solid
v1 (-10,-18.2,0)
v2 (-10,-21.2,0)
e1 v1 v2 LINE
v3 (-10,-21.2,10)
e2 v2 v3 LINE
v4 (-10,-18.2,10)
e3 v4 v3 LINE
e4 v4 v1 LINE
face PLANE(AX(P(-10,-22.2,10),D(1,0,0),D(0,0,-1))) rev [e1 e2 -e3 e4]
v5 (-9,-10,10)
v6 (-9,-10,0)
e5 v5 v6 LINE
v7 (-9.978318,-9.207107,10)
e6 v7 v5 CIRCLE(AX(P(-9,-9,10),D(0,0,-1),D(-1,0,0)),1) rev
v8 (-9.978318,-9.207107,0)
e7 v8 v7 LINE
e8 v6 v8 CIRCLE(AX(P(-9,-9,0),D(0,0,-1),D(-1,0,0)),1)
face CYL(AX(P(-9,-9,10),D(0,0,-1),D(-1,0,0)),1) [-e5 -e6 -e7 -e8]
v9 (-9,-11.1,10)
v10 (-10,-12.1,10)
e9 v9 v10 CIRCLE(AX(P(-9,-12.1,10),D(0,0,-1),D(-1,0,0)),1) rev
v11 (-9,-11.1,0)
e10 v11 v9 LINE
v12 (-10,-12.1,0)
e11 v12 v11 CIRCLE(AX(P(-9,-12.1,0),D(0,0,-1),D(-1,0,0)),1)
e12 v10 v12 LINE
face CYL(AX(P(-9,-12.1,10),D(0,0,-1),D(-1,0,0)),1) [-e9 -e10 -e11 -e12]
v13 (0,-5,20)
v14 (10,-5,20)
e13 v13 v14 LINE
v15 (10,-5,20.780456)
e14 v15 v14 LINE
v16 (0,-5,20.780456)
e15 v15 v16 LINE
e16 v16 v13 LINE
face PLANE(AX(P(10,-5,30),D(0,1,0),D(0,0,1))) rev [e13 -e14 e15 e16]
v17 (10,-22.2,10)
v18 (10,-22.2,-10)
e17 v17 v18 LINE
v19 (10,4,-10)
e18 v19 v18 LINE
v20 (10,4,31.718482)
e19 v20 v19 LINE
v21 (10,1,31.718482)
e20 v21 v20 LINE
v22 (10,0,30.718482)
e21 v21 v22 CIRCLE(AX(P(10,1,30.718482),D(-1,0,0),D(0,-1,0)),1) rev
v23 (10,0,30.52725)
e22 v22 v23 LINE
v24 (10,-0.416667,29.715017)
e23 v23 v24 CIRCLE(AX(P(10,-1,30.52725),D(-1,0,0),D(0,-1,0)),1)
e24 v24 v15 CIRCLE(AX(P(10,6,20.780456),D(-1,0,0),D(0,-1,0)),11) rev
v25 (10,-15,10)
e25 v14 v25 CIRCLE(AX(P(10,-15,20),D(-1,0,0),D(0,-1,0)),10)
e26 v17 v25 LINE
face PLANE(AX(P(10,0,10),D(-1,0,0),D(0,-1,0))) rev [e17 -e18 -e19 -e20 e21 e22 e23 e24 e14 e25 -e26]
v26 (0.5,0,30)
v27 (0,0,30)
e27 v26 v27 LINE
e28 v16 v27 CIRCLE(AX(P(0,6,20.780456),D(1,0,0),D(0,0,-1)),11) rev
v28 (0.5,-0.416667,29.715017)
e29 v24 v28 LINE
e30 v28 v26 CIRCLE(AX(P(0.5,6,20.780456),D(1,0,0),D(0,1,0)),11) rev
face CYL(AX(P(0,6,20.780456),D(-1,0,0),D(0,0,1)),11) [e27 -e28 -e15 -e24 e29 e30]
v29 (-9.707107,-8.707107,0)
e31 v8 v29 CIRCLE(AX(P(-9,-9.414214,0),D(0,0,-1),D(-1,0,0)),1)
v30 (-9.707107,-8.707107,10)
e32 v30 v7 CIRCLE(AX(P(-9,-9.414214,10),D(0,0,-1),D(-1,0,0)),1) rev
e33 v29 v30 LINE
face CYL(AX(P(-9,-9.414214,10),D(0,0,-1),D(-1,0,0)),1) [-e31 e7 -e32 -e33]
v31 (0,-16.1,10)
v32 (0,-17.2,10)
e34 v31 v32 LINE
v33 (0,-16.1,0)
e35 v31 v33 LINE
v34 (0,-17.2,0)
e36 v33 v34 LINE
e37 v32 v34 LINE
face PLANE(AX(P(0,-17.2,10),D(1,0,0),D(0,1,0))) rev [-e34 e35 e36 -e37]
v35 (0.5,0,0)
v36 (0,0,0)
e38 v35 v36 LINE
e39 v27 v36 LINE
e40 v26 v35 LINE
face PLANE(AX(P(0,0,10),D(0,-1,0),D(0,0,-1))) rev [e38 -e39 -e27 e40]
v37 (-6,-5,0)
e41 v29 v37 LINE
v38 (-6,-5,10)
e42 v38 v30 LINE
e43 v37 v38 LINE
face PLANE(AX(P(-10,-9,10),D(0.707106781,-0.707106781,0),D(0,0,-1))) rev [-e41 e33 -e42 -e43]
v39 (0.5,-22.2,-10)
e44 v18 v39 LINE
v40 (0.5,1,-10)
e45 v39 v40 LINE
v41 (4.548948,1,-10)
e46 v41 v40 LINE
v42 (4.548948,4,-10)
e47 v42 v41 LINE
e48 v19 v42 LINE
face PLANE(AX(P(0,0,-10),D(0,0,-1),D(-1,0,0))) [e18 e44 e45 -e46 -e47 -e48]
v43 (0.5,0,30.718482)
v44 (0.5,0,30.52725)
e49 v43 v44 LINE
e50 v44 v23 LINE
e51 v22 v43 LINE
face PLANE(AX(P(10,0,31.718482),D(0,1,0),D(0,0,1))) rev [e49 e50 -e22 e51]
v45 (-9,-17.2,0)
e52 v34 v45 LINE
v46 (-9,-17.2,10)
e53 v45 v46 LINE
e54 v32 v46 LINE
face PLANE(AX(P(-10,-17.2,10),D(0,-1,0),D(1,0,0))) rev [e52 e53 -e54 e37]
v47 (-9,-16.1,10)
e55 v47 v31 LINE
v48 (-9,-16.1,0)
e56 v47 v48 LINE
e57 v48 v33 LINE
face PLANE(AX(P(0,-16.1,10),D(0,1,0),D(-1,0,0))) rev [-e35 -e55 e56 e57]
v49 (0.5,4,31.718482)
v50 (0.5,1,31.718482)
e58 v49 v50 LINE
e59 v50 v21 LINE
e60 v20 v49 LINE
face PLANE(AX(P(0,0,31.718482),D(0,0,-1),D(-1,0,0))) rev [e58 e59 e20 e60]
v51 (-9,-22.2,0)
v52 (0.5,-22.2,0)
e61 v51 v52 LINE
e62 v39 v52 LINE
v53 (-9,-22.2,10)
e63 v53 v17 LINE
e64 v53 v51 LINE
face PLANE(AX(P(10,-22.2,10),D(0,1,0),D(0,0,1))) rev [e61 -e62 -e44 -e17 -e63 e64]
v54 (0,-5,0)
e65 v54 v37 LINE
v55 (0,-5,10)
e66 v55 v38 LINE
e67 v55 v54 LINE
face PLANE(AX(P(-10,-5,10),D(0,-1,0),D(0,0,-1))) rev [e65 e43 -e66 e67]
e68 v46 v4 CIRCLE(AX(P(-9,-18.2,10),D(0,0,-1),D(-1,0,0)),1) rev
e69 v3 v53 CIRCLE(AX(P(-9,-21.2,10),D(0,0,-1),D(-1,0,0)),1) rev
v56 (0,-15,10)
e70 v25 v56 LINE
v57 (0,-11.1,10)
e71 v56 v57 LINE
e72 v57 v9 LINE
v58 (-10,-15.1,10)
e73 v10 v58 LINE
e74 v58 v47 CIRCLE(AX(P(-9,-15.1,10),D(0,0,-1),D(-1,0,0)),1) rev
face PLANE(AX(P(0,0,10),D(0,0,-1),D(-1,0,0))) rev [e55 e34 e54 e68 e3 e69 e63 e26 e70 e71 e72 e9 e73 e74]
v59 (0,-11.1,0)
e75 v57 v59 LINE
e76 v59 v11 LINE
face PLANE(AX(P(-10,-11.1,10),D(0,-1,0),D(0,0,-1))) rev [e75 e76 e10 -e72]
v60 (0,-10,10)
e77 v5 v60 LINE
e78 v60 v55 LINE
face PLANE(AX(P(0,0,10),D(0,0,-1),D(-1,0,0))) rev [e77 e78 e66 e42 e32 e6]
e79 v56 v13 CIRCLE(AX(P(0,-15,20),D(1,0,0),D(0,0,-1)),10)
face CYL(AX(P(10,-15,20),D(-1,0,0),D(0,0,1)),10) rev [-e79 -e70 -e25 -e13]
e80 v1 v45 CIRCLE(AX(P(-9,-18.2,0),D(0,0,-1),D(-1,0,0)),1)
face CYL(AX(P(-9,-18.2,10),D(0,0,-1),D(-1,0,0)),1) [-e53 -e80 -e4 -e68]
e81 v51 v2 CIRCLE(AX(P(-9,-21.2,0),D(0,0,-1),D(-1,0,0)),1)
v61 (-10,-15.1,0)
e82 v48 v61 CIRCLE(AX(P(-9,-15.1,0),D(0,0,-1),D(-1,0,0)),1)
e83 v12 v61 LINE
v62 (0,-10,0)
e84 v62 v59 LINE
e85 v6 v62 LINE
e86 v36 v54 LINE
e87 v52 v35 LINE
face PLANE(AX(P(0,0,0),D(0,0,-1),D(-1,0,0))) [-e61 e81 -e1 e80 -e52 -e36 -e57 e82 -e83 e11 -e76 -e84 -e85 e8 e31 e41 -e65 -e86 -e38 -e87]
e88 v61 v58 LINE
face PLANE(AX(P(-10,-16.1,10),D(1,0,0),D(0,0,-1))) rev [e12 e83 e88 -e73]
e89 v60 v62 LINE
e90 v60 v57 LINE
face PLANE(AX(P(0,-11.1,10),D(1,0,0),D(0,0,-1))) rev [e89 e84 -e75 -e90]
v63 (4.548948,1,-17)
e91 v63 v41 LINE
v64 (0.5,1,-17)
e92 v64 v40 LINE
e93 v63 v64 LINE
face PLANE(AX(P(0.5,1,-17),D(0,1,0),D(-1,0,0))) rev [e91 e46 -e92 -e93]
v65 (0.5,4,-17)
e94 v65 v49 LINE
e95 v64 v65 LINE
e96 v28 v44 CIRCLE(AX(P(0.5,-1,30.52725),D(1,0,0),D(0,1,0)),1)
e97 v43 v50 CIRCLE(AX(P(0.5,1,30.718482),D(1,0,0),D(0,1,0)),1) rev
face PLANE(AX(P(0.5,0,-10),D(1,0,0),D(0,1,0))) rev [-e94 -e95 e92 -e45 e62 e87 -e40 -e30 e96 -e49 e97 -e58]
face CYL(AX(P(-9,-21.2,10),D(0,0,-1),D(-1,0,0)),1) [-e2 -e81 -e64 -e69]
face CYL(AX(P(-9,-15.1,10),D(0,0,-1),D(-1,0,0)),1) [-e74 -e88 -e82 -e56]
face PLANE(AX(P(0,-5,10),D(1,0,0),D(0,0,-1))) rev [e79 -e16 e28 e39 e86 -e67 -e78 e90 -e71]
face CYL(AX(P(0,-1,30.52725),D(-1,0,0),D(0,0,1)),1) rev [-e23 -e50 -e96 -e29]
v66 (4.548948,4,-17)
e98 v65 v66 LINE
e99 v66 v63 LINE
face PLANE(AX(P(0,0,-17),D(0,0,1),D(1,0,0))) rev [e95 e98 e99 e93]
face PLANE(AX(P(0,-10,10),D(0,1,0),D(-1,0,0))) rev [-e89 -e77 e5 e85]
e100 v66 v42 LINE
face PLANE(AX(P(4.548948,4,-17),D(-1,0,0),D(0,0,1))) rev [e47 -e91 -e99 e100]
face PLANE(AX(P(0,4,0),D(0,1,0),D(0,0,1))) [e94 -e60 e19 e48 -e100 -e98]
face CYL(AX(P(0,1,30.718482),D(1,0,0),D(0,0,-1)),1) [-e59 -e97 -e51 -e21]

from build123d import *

# Parameters (mm, degrees)
BOSS_EXTRU_1_DEPTH = 10
ESQUISSE2_W        = 9.5
ESQUISSE2_H        = 22.2
BOSS_EXTRU_2_DEPTH = 10
ESQUISSE3_W        = 10
ESQUISSE3_H        = 5
BOSS_EXTRU_3_DEPTH = 20
CONG_1_R           = 10
CHANFREIN1_SIZE    = 4
CONG_3_R           = 1
ESQUISSE5_W        = 9.5
ESQUISSE5_H        = 4.718482058
BOSS_EXTRU_5_DEPTH = 4
ESQUISSE6_W        = 4.048947881
ESQUISSE6_H        = 3
BOSS_EXTRU_6_DEPTH = 7
ESQUISSE7_W        = 9.5
ESQUISSE7_H        = 4
BOSS_EXTRU_7_DEPTH = 37
CONG_4_R           = 11
CONG_6_R           = 1


with BuildPart() as part:
    # Esquisse1 → Boss.-Extru.1 (new body)
    with BuildSketch(Plane.XY):
        Polygon((0, 0), (10, 0), (10, -22.2), (-10, -22.2), (-10, -17.2), (0, -17.2), (0, -16.1), (-10, -16.1), (-10, -11.1), (0, -11.1), (0, -10), (-10, -10), (-10, -5), (0, -5), align=None)
    extrude(amount=BOSS_EXTRU_1_DEPTH)

    # Esquisse2 → Boss.-Extru.2 (add)
    with BuildSketch(Plane(origin=(0, 0, 0), x_dir=(-1, 0, 0), z_dir=(0, 0, -1))):
        with Locations((-5.25, -11.1)):
            Rectangle(ESQUISSE2_W, ESQUISSE2_H)
    extrude(amount=BOSS_EXTRU_2_DEPTH)

    # Esquisse3 → Boss.-Extru.3 (add)
    with BuildSketch(Plane.XY.offset(10)):
        with Locations((5, -2.5)):
            Rectangle(ESQUISSE3_W, ESQUISSE3_H)
    extrude(amount=BOSS_EXTRU_3_DEPTH)

    # Congé1
    # the kernel refuses this fillet: 10 mm, written as the material it adds along each edge
    with BuildSketch(Plane(origin=(0, -5, 10), x_dir=(0, -1, 0), z_dir=(1, 0, 0))) as cong_1_piece_1:
        with BuildLine():
            CenterArc((CONG_1_R, -CONG_1_R), CONG_1_R, 90, 90)
            Line((0, -CONG_1_R), (0, 0))
            Line((0, 0), (CONG_1_R, 0))
        make_face()
    extrude(amount=10)

    # Chanfrein1
    chanfrein1_edges = [part.edges().sort_by_distance(p)[0] for p in [
        (-10, -5, 5),
    ]]
    chamfer(chanfrein1_edges, length=CHANFREIN1_SIZE)

    # Congé3
    # the kernel refuses this fillet: 1 mm, written as the material it takes off along each edge
    with BuildSketch(Plane(origin=(-10, -22.2, -2.5), x_dir=(1, 0, 0), z_dir=(0, 0, 1)), Plane(origin=(-10, -17.2, -2.5), x_dir=(0, -1, 0), z_dir=(0, 0, 1))) as cong_3_piece_1:
        with BuildLine():
            CenterArc((CONG_3_R, CONG_3_R), CONG_3_R, 180, 90)
            Line((0, CONG_3_R), (0, 0))
            Line((0, 0), (CONG_3_R, 0))
        make_face()
    extrude(amount=15, mode=Mode.SUBTRACT)
    with BuildSketch(Plane(origin=(-10, -16.1, -2.5), x_dir=(0, 1, 0), z_dir=(0, 0, 1)), Plane(origin=(-10, -11.1, -2.5), x_dir=(1, 0, 0), z_dir=(0, 0, 1)), Plane(origin=(-10, -10, -2.5), x_dir=(0, 1, 0), z_dir=(0, 0, 1))) as cong_3_piece_2:
        with BuildLine():
            CenterArc((CONG_3_R, -CONG_3_R), CONG_3_R, 90, 90)
            Line((0, -CONG_3_R), (0, 0))
            Line((0, 0), (CONG_3_R, 0))
        make_face()
    extrude(amount=15, mode=Mode.SUBTRACT)
    with BuildSketch(Plane(origin=(-10, -9, -1.035533906), x_dir=(0, -1, 0), z_dir=(0, 0, 1))) as cong_3_piece_3:
        with BuildLine():
            CenterArc((CONG_3_R * 0.414213562373, CONG_3_R), CONG_3_R, 225, 45)
            Line((-CONG_3_R * 0.292893218813, CONG_3_R * 0.292893218813), (0, 0))
            Line((0, 0), (CONG_3_R * 0.414213562373, 0))
        make_face()
    extrude(amount=12.071067812, mode=Mode.SUBTRACT)

    # Esquisse5 → Boss.-Extru.5 (add)
    with BuildSketch(Plane(origin=(0, 0, 0), x_dir=(1, 0, 0), z_dir=(0, 1, 0))):
        with Locations((5.25, 7.640758971)):
            Rectangle(ESQUISSE5_W, ESQUISSE5_H)
    extrude(amount=BOSS_EXTRU_5_DEPTH)

    # Esquisse6 → Boss.-Extru.6 (add)
    with BuildSketch(Plane(origin=(0, 0, -10), x_dir=(-1, 0, 0), z_dir=(0, 0, -1))):
        with Locations((-2.524473941, 2.5)):
            Rectangle(ESQUISSE6_W, ESQUISSE6_H)
    extrude(amount=BOSS_EXTRU_6_DEPTH)

    # Esquisse7 → Boss.-Extru.7 (add)
    with BuildSketch(Plane.XY.offset(-5.281517942)):
        with Locations((5.25, 2)):
            Rectangle(ESQUISSE7_W, ESQUISSE7_H)
    extrude(amount=BOSS_EXTRU_7_DEPTH)

    # Congé4
    # the kernel refuses this fillet: 11 mm, written as the material it takes off along each edge
    with BuildSketch(Plane(origin=(-23.048861143, -5, 30), x_dir=(0, 1.0, -1.1723955140032709e-12), z_dir=(1, 0, 0))) as cong_4_piece_1:
        with BuildLine():
            CenterArc((11, -9.219544457), CONG_4_R, 123.055731151, 56.944268849)
            Line((0, -9.219544457), (-0.22, -9.219544457))
            Line((-0.22, -9.219544457), (-0.22, 0))
            Line((-0.22, 0), (0, 0.22))
            ThreePointArc((0, 0.22), (2.5, 0.22), (4.88, 0.184390889))
            Line((4.88, 0.184390889), (5, 0))
        make_face()
    extrude(amount=56.097722287, mode=Mode.SUBTRACT)

    # Congé6
    cong_6_edges = [part.edges().sort_by_distance(p)[0] for p in [
        (5.25, 0, 31.718482058),
        (5.25, 0, 30),
    ]]
    fillet(cong_6_edges, radius=CONG_6_R)


solid = part.part
